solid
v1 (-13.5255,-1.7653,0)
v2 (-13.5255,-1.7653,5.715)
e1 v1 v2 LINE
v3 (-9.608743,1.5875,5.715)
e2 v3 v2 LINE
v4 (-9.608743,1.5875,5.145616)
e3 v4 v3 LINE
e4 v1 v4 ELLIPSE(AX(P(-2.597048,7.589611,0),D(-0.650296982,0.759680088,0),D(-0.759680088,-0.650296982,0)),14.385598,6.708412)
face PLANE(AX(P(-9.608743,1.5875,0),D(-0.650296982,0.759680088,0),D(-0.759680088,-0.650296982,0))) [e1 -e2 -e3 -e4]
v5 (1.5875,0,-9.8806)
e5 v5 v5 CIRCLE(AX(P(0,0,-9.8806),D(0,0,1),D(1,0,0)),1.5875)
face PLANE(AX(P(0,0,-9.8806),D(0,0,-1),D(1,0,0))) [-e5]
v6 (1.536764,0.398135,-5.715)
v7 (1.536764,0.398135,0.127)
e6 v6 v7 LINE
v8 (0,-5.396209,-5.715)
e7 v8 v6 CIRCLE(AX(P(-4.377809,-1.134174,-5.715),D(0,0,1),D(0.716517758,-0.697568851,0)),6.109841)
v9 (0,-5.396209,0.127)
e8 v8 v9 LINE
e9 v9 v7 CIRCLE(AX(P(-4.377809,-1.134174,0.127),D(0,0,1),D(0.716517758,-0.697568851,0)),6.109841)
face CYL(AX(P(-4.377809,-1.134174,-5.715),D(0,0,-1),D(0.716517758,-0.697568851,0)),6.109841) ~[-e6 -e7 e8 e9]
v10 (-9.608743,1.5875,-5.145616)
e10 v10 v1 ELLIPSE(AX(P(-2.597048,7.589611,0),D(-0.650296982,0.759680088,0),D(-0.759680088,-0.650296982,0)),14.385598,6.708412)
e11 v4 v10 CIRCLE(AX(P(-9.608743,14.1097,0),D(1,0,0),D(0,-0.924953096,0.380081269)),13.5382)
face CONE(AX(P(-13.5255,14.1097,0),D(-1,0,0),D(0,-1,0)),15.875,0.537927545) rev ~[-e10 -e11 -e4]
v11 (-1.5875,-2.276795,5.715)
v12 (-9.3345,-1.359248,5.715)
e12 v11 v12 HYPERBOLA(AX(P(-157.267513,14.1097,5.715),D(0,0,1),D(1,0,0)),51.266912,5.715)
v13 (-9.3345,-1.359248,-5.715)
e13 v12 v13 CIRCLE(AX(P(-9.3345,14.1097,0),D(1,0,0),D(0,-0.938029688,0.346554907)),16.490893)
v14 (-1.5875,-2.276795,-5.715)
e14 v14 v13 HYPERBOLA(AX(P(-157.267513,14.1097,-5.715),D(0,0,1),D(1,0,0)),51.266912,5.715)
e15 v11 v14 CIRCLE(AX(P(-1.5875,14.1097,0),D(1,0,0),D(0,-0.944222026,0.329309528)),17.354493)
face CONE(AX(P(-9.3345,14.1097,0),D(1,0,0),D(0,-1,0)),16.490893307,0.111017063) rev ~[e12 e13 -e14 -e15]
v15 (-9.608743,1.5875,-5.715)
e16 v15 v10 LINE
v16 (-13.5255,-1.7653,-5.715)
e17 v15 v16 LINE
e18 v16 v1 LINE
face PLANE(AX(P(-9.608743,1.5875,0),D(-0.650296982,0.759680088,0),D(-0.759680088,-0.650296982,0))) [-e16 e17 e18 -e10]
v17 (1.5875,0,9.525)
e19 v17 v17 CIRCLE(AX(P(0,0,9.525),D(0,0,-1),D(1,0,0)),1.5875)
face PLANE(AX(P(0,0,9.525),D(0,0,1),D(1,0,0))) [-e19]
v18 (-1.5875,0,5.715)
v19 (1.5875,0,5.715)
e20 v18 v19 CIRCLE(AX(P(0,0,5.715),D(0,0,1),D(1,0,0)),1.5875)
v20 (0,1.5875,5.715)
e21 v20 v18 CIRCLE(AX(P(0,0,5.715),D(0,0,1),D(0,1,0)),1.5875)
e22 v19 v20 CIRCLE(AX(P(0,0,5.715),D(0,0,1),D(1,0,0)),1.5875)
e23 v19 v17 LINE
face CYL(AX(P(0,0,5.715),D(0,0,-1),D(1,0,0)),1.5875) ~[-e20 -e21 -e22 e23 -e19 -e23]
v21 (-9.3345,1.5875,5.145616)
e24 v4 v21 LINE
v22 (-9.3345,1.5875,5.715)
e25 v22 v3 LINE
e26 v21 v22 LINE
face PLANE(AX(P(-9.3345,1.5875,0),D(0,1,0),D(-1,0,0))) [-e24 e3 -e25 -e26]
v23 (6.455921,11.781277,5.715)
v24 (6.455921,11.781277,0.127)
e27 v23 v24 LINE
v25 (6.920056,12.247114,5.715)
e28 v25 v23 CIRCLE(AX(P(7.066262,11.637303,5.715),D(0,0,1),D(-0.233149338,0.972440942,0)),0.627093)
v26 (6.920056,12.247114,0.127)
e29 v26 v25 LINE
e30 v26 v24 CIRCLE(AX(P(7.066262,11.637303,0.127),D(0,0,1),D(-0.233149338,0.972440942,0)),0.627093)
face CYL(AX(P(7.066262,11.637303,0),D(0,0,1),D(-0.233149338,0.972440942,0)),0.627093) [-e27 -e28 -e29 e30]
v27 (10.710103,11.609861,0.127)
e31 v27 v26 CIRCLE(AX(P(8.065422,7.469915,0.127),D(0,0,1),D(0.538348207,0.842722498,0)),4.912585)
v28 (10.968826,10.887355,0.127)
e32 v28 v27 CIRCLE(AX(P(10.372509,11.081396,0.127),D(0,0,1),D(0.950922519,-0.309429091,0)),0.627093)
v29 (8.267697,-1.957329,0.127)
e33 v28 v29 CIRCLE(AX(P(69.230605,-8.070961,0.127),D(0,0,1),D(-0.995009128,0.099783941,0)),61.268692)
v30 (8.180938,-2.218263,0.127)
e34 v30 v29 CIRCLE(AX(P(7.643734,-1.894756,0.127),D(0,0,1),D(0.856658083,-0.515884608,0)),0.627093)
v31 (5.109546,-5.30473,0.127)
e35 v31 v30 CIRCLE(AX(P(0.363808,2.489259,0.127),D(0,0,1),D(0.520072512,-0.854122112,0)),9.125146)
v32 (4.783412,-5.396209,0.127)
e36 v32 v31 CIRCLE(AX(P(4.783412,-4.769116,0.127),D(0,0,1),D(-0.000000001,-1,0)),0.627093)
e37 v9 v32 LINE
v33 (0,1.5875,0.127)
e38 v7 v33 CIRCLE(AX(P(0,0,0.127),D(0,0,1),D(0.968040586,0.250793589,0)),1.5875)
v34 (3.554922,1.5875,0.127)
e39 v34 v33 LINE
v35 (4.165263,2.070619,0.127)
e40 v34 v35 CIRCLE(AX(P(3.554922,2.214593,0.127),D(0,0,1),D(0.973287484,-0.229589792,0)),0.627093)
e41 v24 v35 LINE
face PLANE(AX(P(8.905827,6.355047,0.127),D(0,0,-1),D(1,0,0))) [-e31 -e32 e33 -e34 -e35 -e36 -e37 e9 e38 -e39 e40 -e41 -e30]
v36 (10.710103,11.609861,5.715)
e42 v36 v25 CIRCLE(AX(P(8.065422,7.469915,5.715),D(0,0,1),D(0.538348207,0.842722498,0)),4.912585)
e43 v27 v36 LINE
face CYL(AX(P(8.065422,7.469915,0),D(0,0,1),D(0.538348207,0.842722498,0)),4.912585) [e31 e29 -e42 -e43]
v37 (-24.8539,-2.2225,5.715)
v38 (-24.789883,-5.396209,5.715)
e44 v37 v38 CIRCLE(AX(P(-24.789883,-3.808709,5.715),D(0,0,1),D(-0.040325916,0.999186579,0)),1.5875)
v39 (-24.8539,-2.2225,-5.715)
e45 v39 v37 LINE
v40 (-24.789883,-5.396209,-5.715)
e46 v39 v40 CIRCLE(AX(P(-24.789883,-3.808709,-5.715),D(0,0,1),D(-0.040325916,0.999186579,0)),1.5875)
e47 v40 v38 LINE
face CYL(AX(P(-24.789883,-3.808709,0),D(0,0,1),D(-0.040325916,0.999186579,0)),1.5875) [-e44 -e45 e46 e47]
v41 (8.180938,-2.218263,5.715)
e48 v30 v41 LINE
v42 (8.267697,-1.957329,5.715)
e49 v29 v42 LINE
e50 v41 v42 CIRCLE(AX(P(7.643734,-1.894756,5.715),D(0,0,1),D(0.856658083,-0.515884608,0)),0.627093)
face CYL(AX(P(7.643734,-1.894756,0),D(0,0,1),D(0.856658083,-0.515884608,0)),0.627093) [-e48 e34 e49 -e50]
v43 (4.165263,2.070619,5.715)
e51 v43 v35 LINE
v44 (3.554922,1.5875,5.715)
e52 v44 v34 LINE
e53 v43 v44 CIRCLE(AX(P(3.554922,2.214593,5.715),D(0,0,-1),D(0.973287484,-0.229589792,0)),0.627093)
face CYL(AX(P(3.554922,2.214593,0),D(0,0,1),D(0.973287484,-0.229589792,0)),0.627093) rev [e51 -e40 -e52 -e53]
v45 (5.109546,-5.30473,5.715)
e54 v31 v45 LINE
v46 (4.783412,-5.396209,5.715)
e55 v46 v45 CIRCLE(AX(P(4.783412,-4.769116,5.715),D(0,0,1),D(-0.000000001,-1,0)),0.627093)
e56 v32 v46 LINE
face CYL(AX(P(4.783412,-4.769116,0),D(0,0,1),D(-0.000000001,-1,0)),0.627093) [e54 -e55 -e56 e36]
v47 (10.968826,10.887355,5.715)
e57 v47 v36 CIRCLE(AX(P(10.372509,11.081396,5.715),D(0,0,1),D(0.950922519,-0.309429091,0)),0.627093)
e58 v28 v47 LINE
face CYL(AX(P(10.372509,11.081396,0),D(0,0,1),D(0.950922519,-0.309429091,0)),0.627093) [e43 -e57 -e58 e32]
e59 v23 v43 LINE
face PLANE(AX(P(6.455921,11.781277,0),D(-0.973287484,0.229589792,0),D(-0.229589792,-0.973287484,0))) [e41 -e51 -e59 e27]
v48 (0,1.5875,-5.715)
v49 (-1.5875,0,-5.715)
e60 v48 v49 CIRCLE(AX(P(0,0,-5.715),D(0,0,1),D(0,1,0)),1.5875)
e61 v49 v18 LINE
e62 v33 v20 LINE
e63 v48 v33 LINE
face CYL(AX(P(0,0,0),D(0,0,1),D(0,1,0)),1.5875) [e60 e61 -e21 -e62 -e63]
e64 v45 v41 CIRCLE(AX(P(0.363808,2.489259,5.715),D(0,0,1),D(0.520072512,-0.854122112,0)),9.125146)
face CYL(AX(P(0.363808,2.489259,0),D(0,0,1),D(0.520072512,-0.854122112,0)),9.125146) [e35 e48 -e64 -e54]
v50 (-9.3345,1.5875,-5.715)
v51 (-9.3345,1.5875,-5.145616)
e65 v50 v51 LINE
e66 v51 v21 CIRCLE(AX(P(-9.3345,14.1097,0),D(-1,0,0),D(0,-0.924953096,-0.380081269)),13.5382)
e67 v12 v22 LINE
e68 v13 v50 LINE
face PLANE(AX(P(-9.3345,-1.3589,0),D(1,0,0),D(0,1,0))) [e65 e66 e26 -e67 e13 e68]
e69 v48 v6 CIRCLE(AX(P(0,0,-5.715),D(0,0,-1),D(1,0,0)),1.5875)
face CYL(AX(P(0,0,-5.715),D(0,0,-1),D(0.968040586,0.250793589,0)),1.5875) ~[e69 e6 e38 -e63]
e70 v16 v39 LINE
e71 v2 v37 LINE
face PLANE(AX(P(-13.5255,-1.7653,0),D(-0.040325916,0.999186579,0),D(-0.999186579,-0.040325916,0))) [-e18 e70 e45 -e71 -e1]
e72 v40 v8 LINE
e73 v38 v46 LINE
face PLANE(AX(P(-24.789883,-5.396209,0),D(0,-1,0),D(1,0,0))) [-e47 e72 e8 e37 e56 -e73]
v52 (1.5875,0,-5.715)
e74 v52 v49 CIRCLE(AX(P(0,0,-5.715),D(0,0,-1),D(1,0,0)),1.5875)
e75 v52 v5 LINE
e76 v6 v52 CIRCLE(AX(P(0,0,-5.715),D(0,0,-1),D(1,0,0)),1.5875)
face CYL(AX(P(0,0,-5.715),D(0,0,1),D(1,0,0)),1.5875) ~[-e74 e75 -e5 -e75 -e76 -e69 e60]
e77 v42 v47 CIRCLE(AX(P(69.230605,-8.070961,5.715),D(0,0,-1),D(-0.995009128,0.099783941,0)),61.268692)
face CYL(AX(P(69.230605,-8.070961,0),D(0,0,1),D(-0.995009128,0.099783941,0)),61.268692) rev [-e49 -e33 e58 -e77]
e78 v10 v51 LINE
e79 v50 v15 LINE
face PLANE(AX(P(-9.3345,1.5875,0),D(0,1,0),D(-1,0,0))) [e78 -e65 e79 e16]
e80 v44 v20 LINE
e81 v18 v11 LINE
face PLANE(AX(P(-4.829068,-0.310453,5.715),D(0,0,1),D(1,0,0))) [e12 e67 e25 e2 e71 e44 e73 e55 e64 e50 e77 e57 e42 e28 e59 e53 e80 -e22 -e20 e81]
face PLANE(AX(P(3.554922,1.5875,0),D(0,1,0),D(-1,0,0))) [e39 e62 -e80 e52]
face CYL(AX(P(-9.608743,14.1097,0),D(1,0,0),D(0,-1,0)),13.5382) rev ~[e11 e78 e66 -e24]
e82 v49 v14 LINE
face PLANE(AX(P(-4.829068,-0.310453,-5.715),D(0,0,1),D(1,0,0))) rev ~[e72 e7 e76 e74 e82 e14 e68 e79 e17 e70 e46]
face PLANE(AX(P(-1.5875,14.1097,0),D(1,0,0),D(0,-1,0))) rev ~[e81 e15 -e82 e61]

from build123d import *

# Parameters (mm, degrees)
F1_DEPTH = 5.715
F2_R     = 1.5875
F3_DEPTH = 4.1656
F4_R     = 1.5875
F5_DEPTH = 3.81
F7_DEPTH = 5.842


with BuildPart() as f1:
    # F0 (on Top) → F1 (new body, symmetric)
    with BuildSketch(Plane.XY):
        with BuildLine():
            Line((3.5549216614, 1.5875), (0, 1.5875))
            ThreePointArc((0, 1.5875), (-1.1225320151, 1.1225320151), (-1.5875, 0))
            Line((-1.5875, 0), (-1.5875, -2.2225))
            Line((-1.5875, -2.2225), (-9.3345, -1.3589))
            Line((-9.3345, -1.3589), (-9.3345, 1.5875))
            Line((-9.3345, 1.5875), (-9.608742781, 1.5875))
            Line((-9.608742781, 1.5875), (-13.5255, -1.7653))
            Line((-13.5255, -1.7653), (-24.8539, -2.2225))
            ThreePointArc((-24.8539, -2.2225), (-26.3770597496, -3.8407239016), (-24.7898826087, -5.3962086948))
            Line((-24.7898826087, -5.3962086948), (4.7834118114, -5.3962086948))
            ThreePointArc((4.7834118114, -5.3962086948), (4.9527721319, -5.3729059822), (5.1095456268, -5.3047296971))
            ThreePointArc((5.1095456268, -5.3047296971), (6.8320364553, -3.9473788403), (8.1809379528, -2.2182632419))
            ThreePointArc((8.1809379528, -2.2182632419), (8.238795955, -2.0926103635), (8.2676969204, -1.9573294393))
            ThreePointArc((8.2676969204, -1.9573294393), (9.2733035869, 4.537554361), (10.9688257926, 10.8873547355))
            ThreePointArc((10.9688257926, 10.8873547355), (10.9628913183, 11.2928057385), (10.7101033421, 11.6098608961))
            ThreePointArc((10.7101033421, 11.6098608961), (8.8799829062, 12.3144977387), (6.9200560471, 12.2471137853))
            ThreePointArc((6.9200560471, 12.2471137853), (6.6220302078, 12.0799126553), (6.4559206195, 11.7812770521))
            Line((6.4559206195, 11.7812770521), (4.1652633995, 2.0706188245))
            ThreePointArc((4.1652633995, 2.0706188245), (3.9441262464, 1.7228965355), (3.5549216614, 1.5875))
        make_face()
    extrude(amount=F1_DEPTH, both=True)

    # F2 (on face) → F3 (join)
    with BuildSketch(Plane(origin=(0, 0, -5.715), x_dir=(1, 0, 0), z_dir=(0, 0, -1))):
        Circle(F2_R)
    extrude(amount=F3_DEPTH)

    # F4 (on face) → F5 (join)
    with BuildSketch(Plane.XY.offset(5.715)):
        Circle(F4_R)
    extrude(amount=F5_DEPTH)

    # F6 (on face) → F7 (cut)
    with BuildSketch(Plane(origin=(0, 0, -5.715), x_dir=(1, 0, 0), z_dir=(0, 0, -1))):
        with BuildLine():
            Line((9.2012649402, 17.4278523773), (0, 5.3962086948))
            ThreePointArc((0, 5.3962086948), (1.5278567181, 2.7004632752), (1.5367644299, -0.3981348225))
            ThreePointArc((1.5367644299, -0.3981348225), (0.9716267852, -1.255427274), (0, -1.5875))
            Line((0, -1.5875), (-3.6485670134, -20.050900057))
            Line((-3.6485670134, -20.050900057), (23.1213513762, -22.8752493858))
            Line((23.1213513762, -22.8752493858), (9.2012649402, 17.4278523773))
        make_face()
    extrude(amount=-F7_DEPTH, mode=Mode.SUBTRACT)

    # F8 (on Top) → F9 (revolve, cut)
    with BuildSketch(Plane.XY):
        Polygon((-9.3345, -2.3811933066), (-1.5875, -3.2447933066), (-1.5875, 2.2244379615), (-13.4883278617, 2.3323959991), (-13.5255, -1.7653), (-9.608742781, 0.5715), (-9.3345, 0.5715), align=None)
    revolve(axis=Axis((0.2309344709, 14.1097, 0), (1, 0, 0)), mode=Mode.SUBTRACT)


solid = f1.part
